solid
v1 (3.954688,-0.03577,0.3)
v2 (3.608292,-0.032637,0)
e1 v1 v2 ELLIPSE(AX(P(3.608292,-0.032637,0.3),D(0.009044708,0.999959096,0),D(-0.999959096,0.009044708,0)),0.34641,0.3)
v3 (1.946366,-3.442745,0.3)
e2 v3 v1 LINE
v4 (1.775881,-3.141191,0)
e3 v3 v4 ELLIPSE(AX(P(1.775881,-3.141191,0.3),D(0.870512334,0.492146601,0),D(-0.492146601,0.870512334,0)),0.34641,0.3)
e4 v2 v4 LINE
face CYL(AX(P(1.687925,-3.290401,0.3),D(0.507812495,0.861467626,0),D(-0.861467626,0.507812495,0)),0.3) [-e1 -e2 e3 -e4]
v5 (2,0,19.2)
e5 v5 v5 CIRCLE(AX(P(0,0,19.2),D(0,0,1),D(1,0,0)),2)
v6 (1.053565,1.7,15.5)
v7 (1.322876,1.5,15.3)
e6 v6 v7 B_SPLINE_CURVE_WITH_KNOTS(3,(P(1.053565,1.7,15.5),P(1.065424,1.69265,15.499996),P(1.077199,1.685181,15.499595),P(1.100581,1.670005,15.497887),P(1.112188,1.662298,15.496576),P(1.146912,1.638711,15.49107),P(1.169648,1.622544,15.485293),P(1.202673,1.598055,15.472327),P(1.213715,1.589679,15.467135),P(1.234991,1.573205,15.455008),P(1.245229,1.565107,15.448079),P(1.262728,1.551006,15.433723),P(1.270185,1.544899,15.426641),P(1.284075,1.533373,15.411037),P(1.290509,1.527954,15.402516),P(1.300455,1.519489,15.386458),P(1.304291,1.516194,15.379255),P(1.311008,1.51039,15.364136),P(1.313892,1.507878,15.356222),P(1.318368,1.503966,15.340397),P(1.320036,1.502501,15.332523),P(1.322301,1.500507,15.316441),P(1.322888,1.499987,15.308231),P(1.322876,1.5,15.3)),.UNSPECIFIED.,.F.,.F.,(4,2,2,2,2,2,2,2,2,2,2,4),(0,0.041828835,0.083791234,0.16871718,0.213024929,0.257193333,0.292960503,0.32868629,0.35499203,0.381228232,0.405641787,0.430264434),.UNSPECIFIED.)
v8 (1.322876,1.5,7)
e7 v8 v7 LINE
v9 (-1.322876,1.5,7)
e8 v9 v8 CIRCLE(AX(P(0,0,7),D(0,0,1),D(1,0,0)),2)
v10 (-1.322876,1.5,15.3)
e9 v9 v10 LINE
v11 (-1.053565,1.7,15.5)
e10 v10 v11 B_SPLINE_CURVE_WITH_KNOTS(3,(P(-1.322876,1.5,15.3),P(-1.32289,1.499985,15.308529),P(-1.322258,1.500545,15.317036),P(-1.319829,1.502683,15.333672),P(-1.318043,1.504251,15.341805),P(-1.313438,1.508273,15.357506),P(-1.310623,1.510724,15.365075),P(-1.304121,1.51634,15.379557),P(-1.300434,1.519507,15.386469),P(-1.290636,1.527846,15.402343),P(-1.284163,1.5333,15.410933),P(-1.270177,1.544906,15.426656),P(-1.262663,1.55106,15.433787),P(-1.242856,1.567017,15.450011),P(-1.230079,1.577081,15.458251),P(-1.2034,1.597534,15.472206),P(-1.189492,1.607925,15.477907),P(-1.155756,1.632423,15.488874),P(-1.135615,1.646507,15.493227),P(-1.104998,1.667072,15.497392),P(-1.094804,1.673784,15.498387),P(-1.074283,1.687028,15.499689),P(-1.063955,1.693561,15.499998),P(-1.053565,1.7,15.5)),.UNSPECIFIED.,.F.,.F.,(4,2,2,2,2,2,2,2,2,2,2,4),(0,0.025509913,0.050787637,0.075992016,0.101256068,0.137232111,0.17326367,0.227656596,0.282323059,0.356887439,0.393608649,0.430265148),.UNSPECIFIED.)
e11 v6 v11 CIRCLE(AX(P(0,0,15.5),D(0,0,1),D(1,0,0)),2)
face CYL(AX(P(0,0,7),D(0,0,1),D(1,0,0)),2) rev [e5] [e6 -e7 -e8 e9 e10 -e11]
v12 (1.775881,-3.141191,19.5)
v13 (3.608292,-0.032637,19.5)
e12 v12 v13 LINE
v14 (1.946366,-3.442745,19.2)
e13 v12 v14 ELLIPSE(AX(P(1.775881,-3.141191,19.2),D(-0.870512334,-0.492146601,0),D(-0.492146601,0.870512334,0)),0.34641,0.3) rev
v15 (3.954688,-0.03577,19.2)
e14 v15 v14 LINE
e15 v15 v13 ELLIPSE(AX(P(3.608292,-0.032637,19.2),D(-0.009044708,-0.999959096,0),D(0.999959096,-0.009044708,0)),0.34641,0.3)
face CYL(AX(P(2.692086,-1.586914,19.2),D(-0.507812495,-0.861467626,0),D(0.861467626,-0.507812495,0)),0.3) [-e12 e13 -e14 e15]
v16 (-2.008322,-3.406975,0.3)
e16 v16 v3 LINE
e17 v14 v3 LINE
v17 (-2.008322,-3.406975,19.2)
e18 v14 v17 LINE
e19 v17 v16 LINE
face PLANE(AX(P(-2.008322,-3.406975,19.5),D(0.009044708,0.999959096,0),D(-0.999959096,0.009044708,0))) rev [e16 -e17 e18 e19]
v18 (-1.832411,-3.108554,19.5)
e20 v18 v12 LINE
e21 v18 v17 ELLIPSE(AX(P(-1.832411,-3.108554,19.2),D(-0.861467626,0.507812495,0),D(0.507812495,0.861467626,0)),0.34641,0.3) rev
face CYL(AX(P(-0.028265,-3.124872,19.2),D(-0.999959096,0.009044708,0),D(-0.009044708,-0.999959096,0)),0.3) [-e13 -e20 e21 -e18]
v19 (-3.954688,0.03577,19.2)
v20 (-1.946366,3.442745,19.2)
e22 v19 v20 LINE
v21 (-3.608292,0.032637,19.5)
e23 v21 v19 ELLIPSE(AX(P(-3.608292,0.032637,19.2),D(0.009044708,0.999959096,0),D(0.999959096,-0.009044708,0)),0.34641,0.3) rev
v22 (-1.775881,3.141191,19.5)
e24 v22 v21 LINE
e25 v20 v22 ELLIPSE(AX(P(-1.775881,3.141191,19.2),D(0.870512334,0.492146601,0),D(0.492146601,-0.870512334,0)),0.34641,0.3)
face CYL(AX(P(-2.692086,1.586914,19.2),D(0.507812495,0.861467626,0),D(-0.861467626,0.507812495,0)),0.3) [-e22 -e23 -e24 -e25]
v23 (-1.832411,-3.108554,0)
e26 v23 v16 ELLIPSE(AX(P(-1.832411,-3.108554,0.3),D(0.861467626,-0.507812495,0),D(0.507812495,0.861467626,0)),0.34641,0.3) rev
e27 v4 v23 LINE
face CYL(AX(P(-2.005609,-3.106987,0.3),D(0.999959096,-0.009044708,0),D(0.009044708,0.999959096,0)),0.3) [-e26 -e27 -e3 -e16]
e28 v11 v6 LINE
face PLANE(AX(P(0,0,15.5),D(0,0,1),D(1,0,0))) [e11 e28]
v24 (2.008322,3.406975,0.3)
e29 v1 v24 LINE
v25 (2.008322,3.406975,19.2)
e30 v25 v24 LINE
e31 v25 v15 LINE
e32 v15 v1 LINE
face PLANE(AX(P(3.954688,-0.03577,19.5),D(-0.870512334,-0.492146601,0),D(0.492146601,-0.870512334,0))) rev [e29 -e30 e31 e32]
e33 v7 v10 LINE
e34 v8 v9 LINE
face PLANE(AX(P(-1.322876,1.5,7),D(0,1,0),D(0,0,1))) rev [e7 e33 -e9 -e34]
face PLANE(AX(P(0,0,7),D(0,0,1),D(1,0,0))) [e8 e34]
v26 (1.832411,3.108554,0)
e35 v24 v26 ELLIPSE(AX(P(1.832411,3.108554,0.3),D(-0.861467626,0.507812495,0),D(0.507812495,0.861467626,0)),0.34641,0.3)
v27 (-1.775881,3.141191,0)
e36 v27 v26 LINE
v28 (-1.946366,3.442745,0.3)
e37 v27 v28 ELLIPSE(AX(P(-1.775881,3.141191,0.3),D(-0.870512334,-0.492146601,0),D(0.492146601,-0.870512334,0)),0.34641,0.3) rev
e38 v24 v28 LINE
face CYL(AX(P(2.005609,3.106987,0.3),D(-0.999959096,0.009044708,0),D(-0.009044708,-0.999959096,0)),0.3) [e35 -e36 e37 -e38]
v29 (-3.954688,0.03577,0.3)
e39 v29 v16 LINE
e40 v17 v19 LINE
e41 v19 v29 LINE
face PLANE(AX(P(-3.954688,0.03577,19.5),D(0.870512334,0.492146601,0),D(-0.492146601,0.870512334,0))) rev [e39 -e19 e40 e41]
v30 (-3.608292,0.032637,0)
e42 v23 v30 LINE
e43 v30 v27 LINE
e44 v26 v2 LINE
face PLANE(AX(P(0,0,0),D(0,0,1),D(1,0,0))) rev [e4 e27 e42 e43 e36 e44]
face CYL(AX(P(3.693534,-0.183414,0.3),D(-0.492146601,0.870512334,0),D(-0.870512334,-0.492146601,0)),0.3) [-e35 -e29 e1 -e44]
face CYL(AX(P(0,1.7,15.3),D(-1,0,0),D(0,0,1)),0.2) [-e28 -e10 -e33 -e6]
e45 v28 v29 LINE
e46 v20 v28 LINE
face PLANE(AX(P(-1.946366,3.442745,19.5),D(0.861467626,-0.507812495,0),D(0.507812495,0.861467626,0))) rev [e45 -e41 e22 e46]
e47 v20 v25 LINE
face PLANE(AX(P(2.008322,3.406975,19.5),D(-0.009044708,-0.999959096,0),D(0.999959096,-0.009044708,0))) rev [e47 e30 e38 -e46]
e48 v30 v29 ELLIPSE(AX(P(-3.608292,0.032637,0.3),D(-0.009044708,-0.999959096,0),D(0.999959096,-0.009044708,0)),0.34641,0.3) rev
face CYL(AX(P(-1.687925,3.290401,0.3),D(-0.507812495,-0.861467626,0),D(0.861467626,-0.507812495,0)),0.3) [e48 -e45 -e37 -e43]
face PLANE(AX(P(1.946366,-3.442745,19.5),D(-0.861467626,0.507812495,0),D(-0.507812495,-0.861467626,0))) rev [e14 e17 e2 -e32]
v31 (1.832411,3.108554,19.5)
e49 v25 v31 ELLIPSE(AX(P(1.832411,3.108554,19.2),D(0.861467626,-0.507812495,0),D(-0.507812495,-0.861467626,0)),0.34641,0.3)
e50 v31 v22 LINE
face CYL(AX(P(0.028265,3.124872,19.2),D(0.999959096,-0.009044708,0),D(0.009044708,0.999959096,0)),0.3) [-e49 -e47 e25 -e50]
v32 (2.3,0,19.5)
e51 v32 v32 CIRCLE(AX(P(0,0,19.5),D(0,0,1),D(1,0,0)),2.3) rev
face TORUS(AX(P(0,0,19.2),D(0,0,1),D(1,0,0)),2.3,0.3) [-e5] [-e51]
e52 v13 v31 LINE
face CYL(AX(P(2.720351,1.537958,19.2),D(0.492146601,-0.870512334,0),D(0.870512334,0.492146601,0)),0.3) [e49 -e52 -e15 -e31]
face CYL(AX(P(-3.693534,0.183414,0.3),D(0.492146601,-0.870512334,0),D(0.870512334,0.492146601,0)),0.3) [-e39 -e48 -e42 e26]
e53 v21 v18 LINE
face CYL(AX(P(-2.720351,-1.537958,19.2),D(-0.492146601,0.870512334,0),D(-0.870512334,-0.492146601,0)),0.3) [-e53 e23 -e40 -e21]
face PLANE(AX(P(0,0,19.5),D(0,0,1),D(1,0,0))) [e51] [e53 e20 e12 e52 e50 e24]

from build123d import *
from build123d.topology import SkipClean

# Parameters (mm, degrees)
EXTRUDE_1_DEPTH     = 19.5
CUT_EXTRUDE_1_DEPTH = 12.5
SKETCH_3_R          = 2
CUT_EXTRUDE_2_DEPTH = 4
FILLET_1_R          = 0.3
FILLET_2_R          = 0.2


with BuildPart() as part:
    # Эскиз1 → Бобышка-Вытянуть1 (new body)
    with BuildSketch(Plane.XY):
        Polygon((2.008322, 3.406975), (-1.946366, 3.442745), (-3.954688, 0.03577), (-2.008322, -3.406975), (1.946366, -3.442745), (3.954688, -0.03577), align=None)
    extrude(amount=EXTRUDE_1_DEPTH)

    # Эскиз2 → Вырез-Вытянуть1 (cut)
    with BuildSketch(Plane.XY.offset(19.5)):
        with BuildLine():
            Line((-1.322876, 1.5), (1.322876, 1.5))
            ThreePointArc((1.322876, 1.5), (0, -2), (-1.322876, 1.5))
        make_face()
    extrude(amount=-CUT_EXTRUDE_1_DEPTH, mode=Mode.SUBTRACT)

    # Эскиз3 → Вырез-Вытянуть2 (cut)
    with SkipClean():  # the faces are left unmerged after this step: merging them gives an invalid solid
        with BuildSketch(Plane.XY.offset(19.5)):
            Circle(SKETCH_3_R)
        extrude(amount=-CUT_EXTRUDE_2_DEPTH, mode=Mode.SUBTRACT)

    # Скругление1
    fillet_1_edges = [part.edges().sort_by_distance(p)[0] for p in [
        (-2.950527, 1.739258, 19.5),
        (-2.981505, -1.685602, 19.5),
        (-0.030978, -3.42486, 19.5),
        (2.950527, -1.739258, 19.5),
        (-0.822876, -1.822876, 19.5),
        (2.981505, 1.685602, 19.5),
        (2.950527, -1.739258, 0),
        (-0.030978, -3.42486, 0),
        (-2.981505, -1.685602, 0),
        (0.030978, 3.42486, 19.5),
        (-2.950527, 1.739258, 0),
        (0.030978, 3.42486, 0),
        (2.981505, 1.685602, 0),
    ]]
    fillet(fillet_1_edges, radius=FILLET_1_R)

    # Скругление2
    # the kernel refuses this fillet: 0.2 mm, written as the material it takes off along each edge
    with BuildSketch(Plane(origin=(1.822876, 1.5, 15.5), x_dir=(0, 1, 0), z_dir=(-1, 0, 0))) as fillet_2_piece_1_section:
        with BuildLine():
            CenterArc((FILLET_2_R, FILLET_2_R), FILLET_2_R, 180, 90)
            Line((0, FILLET_2_R), (0, 0))
            Line((0, 0), (FILLET_2_R, 0))
        make_face()
    fillet_2_piece_1 = extrude(amount=3.645751, mode=Mode.PRIVATE)
    fillet_2_piece_1 = fillet_2_piece_1 & Plane(origin=(0, 0, 15.453639), x_dir=(0.6614378277661478, 0.75, 0), z_dir=(0, 0, 1)) * Cylinder(2, 9, mode=Mode.PRIVATE)
    add(fillet_2_piece_1, mode=Mode.SUBTRACT)


solid = part.part
